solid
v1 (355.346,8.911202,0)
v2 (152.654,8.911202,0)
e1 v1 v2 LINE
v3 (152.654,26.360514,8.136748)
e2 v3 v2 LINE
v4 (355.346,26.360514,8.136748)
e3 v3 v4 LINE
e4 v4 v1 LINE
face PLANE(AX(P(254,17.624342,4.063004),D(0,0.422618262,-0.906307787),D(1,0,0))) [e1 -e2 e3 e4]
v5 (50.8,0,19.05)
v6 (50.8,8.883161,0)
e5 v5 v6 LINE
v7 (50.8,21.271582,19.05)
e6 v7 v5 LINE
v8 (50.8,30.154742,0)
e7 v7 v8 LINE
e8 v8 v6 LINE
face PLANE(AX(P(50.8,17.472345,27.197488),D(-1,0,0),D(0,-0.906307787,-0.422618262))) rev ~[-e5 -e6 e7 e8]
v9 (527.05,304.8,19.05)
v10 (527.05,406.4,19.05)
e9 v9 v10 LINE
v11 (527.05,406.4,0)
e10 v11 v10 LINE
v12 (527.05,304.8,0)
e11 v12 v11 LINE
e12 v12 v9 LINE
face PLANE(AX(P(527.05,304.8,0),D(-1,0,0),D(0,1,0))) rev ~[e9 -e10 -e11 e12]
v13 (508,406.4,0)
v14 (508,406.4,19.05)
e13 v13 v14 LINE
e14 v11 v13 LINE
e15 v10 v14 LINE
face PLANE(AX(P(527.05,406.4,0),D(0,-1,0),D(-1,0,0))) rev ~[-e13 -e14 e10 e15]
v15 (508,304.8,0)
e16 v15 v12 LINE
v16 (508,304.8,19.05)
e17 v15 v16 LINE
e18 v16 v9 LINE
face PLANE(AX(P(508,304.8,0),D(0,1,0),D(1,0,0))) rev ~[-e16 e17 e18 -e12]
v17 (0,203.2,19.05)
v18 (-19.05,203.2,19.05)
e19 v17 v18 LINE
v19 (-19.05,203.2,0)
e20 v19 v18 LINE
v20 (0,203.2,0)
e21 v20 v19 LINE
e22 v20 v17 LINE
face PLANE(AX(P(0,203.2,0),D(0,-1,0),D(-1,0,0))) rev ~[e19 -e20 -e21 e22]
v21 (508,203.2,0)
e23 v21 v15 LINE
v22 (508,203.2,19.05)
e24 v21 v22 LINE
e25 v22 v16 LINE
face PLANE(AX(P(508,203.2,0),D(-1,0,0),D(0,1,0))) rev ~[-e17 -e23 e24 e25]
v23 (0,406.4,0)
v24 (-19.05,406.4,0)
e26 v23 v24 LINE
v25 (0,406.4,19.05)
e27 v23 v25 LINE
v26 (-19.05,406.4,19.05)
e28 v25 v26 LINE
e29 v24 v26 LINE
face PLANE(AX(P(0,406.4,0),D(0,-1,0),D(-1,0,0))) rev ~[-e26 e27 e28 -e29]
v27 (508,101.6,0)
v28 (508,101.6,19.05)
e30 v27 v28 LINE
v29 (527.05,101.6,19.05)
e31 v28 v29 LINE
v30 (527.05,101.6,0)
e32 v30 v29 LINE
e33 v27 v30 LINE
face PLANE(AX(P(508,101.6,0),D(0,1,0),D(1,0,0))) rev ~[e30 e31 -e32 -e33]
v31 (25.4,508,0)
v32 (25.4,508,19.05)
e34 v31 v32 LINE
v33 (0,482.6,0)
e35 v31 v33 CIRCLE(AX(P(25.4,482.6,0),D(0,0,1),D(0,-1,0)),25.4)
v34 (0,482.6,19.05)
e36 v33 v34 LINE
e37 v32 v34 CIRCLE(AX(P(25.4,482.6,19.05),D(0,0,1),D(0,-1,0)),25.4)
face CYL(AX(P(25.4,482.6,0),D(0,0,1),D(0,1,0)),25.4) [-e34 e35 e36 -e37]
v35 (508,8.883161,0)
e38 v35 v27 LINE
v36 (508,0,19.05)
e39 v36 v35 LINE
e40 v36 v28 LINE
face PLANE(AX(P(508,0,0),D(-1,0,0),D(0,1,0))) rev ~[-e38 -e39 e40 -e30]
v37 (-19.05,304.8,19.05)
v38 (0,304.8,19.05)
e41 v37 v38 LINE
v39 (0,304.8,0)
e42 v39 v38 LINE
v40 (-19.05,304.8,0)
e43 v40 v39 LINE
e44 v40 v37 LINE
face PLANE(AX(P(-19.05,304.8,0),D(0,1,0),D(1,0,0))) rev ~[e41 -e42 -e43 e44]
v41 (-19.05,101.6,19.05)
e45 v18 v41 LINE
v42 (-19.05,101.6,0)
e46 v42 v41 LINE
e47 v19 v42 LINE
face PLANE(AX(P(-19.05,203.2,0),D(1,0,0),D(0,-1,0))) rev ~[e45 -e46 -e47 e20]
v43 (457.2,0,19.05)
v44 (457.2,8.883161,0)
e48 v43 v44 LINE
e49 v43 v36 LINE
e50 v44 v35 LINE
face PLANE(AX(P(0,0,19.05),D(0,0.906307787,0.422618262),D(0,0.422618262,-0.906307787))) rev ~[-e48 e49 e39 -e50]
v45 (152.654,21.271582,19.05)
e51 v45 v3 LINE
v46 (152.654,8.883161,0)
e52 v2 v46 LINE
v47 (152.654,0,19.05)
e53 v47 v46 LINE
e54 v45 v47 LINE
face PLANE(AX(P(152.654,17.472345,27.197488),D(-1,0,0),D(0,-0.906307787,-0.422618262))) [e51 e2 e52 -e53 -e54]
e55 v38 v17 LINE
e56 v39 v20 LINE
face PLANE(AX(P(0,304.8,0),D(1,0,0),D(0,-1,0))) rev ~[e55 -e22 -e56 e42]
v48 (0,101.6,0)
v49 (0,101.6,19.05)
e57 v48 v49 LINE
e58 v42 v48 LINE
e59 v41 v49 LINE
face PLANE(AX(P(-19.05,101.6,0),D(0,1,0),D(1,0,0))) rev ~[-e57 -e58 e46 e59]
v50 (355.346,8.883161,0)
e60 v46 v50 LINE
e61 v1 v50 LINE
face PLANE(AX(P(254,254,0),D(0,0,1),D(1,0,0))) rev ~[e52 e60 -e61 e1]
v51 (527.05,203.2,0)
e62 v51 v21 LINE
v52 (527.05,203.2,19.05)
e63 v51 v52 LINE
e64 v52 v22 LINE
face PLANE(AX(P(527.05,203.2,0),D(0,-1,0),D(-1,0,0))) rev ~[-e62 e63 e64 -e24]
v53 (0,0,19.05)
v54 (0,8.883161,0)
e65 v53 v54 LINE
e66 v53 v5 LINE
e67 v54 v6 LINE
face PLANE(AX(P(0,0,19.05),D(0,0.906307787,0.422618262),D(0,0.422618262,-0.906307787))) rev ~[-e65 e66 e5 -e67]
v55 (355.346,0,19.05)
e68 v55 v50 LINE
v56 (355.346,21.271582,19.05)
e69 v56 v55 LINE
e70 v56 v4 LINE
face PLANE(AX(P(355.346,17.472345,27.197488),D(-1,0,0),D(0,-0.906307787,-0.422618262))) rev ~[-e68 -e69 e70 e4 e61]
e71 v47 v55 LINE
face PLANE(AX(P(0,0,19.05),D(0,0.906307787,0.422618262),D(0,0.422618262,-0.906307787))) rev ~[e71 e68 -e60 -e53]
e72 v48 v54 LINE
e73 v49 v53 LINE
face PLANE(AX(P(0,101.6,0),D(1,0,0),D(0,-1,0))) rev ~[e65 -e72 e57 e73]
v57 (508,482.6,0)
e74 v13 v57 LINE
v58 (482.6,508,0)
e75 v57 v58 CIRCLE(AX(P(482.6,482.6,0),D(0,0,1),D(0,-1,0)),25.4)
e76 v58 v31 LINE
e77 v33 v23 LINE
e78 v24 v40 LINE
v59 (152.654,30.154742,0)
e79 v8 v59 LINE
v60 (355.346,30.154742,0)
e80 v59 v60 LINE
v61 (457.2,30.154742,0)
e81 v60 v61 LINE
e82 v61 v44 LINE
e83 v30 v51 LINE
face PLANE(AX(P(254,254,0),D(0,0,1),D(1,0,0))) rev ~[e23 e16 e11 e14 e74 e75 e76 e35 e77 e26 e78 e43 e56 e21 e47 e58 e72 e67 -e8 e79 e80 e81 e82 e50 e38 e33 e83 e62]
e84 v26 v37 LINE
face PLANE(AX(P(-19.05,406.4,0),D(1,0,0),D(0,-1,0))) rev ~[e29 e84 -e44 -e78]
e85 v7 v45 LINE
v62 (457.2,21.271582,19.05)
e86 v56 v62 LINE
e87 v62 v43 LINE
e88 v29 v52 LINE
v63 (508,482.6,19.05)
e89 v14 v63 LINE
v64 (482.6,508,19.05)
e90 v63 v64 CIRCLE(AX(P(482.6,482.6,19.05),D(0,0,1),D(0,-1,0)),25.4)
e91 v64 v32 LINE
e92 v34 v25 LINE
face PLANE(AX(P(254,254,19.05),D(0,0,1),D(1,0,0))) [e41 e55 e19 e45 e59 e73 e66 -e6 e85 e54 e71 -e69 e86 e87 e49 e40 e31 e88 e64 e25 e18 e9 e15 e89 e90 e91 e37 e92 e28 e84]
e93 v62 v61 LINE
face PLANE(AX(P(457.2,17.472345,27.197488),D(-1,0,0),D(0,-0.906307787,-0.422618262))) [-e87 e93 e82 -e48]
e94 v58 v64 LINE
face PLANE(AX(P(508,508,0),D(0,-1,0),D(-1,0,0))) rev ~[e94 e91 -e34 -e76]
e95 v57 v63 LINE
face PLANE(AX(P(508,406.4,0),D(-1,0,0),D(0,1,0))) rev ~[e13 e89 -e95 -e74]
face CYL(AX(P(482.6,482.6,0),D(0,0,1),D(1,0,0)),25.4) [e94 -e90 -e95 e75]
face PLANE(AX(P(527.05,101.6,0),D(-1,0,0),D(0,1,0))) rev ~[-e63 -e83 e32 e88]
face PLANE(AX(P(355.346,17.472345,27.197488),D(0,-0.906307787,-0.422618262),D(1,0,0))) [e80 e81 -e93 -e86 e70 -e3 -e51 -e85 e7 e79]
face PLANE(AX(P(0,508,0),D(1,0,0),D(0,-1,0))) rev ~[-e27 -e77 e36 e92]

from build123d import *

# Parameters (mm, degrees)
F1_DEPTH  = 19.05
F2_R      = 25.4
F4_DEPTH  = 527.051
F6_W      = 101.854
F6_H      = 19.2786
F7_DEPTH  = 231.9562403073
F9_W      = 202.692
F9_H      = 19.2786
F10_DEPTH = 210.9250403073


with BuildPart() as f1:
    # F0 (on Top) → F1 (new body)
    with BuildSketch(Plane.XY):
        Polygon((0, 101.6), (0, 0), (508, 0), (508, 101.6), (527.05, 101.6), (527.05, 152.4), (527.05, 203.2), (508, 203.2), (508, 304.8), (527.05, 304.8), (527.05, 355.6), (527.05, 406.4), (508, 406.4), (508, 508), (254, 508), (0, 508), (0, 406.4), (-19.05, 406.4), (-19.05, 355.6), (-19.05, 304.8), (0, 304.8), (0, 203.2), (-19.05, 203.2), (-19.05, 152.4), (-19.05, 101.6), align=None)
    extrude(amount=F1_DEPTH)

    # F2
    f2_edges = [f1.edges().sort_by_distance(p)[0] for p in [
        (0, 508, 9.525),
        (508, 508, 9.525),
    ]]
    fillet(f2_edges, radius=F2_R)

    # F3 (on face) → F4 (cut, through all)
    with BuildSketch(Plane(origin=(0, 0, 0), x_dir=(0, -1, 0), z_dir=(-1, 0, 0))):
        Polygon((0, 0), (0, 19.05), (-8.8831608879, 0), align=None)
    extrude(amount=-F4_DEPTH, mode=Mode.SUBTRACT)

    # F6 (on face) → F7 (cut, through all)
    with BuildSketch(Plane(origin=(0, -7.2965733207, 15.6475519823), x_dir=(1, 0, 0), z_dir=(0, 0.4226182617, -0.906307787))):
        with Locations((101.727, -17.6901778862)):
            Rectangle(F6_W, F6_H)
        with Locations((406.273, -17.6901778862)):
            Rectangle(F6_W, F6_H)
    extrude(amount=F7_DEPTH, mode=Mode.SUBTRACT)

    # F9 (on face) → F10 (cut, through all)
    with BuildSketch(Plane(origin=(0, 1.5915958656, -3.4131883485), x_dir=(1, 0, 0), z_dir=(0, 0.4226182617, -0.906307787))):
        with Locations((254, -17.6901778862)):
            Rectangle(F9_W, F9_H)
    extrude(amount=F10_DEPTH, mode=Mode.SUBTRACT)


solid = f1.part
